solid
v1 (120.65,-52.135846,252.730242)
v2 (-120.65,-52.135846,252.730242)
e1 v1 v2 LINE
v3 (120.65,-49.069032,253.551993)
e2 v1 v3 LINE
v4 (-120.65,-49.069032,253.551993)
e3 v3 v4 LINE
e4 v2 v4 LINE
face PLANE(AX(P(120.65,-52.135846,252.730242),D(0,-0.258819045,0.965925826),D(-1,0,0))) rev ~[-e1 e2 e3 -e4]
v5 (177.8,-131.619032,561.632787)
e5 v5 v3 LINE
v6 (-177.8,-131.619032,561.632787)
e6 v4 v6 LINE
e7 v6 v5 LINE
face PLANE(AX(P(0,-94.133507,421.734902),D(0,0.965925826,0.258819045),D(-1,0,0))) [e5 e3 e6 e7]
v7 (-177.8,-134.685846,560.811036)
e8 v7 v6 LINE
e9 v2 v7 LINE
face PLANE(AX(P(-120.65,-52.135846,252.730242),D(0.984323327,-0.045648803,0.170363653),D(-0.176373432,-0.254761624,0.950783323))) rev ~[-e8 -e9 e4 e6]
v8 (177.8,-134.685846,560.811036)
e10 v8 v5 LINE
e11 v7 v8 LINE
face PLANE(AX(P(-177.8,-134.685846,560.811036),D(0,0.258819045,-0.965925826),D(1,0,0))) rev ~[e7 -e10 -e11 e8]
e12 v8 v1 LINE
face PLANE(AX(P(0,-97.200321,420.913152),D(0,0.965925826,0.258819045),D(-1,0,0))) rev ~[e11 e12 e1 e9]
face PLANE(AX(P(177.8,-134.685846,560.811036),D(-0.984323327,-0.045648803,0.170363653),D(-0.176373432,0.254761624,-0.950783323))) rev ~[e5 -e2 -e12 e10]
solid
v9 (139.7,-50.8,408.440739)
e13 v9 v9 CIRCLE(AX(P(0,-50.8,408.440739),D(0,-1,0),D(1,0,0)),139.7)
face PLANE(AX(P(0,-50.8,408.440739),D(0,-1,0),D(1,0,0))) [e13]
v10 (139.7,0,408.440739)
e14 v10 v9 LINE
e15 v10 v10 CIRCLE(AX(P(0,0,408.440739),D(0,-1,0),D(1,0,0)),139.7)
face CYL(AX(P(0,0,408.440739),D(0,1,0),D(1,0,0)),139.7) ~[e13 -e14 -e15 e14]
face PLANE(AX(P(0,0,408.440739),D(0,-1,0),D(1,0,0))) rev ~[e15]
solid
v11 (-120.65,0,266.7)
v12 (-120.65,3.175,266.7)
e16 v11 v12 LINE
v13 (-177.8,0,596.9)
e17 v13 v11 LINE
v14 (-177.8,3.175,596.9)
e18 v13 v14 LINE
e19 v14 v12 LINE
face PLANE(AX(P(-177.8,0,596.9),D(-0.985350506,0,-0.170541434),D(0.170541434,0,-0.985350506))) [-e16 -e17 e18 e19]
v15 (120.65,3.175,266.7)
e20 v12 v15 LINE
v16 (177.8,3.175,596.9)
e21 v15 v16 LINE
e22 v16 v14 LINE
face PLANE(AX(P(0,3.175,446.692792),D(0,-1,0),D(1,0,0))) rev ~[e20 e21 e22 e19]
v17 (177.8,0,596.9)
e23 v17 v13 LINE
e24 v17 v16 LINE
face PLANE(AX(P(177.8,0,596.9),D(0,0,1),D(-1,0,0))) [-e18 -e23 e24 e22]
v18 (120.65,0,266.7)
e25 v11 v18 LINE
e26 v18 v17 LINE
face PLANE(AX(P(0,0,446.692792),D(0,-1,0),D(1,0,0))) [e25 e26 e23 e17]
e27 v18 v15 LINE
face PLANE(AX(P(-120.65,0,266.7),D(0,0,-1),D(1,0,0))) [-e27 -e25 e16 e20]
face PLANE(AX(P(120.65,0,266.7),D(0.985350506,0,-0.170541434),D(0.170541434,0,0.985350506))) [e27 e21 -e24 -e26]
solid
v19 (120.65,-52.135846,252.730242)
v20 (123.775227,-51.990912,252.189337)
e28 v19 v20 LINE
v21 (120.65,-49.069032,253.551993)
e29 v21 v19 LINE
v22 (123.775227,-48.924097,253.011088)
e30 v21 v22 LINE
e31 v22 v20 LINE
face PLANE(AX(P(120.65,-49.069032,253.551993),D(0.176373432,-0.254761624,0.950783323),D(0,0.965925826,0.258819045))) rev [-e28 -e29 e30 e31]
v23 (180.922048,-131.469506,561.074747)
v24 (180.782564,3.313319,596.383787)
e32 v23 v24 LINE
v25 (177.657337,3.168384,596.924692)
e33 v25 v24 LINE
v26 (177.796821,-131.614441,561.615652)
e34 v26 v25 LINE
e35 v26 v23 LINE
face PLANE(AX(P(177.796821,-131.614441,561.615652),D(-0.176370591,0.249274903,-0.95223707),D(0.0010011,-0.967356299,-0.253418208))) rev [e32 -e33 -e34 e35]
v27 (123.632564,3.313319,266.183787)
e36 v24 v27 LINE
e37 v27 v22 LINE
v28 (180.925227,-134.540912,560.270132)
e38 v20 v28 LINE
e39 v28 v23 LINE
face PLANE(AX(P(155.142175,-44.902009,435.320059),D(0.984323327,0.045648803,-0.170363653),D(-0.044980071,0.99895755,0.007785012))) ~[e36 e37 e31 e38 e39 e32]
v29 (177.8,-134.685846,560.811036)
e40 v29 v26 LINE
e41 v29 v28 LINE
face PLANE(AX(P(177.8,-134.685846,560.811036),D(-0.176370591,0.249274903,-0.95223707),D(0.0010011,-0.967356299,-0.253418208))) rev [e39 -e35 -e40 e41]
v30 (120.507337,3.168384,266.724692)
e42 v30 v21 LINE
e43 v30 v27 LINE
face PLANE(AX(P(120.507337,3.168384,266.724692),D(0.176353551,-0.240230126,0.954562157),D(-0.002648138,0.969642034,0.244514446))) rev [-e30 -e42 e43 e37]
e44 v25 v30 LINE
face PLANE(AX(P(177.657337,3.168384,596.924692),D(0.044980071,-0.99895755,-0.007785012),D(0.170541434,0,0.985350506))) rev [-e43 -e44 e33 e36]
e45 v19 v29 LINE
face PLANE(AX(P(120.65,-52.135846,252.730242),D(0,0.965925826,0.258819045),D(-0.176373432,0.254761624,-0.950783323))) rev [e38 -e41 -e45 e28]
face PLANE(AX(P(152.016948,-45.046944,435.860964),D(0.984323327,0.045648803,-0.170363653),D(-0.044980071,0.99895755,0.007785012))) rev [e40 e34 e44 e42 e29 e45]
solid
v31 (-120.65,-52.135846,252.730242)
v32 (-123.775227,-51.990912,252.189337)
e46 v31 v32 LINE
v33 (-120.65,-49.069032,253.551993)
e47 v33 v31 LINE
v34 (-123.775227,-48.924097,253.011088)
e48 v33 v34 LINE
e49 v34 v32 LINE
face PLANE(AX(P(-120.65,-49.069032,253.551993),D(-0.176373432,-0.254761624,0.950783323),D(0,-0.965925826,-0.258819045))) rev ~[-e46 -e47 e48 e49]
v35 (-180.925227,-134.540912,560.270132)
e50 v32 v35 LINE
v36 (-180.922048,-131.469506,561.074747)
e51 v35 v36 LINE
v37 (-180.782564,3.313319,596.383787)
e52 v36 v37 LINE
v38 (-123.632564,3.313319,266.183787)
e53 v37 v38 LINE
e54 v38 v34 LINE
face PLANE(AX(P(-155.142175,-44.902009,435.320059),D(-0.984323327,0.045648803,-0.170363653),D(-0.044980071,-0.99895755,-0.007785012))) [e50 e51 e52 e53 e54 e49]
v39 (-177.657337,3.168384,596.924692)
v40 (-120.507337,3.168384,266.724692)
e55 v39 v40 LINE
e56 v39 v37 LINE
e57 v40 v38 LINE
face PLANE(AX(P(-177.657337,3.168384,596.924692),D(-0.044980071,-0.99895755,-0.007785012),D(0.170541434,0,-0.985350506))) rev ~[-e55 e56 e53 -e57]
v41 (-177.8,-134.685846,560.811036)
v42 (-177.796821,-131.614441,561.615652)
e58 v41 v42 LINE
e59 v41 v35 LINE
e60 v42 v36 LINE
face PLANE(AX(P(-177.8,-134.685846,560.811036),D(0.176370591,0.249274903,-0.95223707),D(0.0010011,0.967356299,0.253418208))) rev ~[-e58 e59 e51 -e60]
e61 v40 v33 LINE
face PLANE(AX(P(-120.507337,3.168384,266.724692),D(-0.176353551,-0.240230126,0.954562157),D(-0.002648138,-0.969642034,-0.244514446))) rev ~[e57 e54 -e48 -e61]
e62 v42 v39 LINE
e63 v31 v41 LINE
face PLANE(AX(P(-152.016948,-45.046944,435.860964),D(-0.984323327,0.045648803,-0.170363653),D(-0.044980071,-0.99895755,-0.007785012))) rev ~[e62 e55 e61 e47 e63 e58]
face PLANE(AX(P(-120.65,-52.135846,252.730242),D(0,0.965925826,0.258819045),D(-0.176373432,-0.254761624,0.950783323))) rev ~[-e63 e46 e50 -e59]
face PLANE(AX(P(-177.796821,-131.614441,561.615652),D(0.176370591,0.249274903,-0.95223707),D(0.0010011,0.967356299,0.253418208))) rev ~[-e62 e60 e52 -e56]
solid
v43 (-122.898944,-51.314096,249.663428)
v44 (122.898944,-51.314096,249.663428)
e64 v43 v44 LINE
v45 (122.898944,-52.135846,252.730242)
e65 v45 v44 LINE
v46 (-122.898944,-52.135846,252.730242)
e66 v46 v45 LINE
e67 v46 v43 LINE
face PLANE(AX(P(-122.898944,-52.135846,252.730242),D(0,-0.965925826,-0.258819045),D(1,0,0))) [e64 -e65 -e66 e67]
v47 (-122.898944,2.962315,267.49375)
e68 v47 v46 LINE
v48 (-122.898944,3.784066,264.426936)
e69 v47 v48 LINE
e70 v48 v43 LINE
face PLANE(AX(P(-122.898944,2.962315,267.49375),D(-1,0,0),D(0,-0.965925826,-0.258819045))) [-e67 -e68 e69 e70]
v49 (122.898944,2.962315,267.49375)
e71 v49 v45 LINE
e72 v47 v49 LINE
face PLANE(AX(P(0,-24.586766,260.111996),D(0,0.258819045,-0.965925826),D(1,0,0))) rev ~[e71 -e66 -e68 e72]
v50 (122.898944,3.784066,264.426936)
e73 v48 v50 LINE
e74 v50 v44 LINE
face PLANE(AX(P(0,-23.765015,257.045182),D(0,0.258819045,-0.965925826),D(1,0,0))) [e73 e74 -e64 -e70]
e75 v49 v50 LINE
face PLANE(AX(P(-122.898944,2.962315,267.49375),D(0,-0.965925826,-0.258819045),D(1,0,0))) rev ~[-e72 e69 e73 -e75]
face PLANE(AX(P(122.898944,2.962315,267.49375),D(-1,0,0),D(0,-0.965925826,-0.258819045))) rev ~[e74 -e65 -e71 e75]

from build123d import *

# Parameters (mm, degrees)
F2_DEPTH  = 3.175
F3_R      = 139.7
F4_DEPTH  = 50.8
F8_DEPTH  = 3.175
F10_DEPTH = 3.175
F12_W     = 245.7978874445
F12_H     = 57.0418144985
F13_DEPTH = 3.175


with BuildPart() as f2:
    # F1 (on Front) → F2 (new body)
    with BuildSketch(Plane.XZ):
        Polygon((120.65, 266.7), (177.8, 596.9), (-177.8, 596.9), (-120.65, 266.7), align=None)
    extrude(amount=-F2_DEPTH)


with BuildPart() as f4:
    # F3 (on face) → F4 (new body)
    with BuildSketch(Plane.XZ):
        with Locations((0, 408.4407389164)):
            Circle(F3_R)
    extrude(amount=F4_DEPTH)


with BuildPart() as f8:
    # F7 (on face) → F8 (new body)
    with BuildSketch(Plane(origin=(0, 14.539153526, 3.8957544459), x_dir=(-1, 0, 0), z_dir=(0, 0.9659258263, 0.2588190451))):
        Polygon((120.65, 257.6124178713), (177.8, 576.5611257119), (-177.8, 576.5611257119), (-120.65, 257.6124178713), align=None)
    extrude(amount=F8_DEPTH)


with BuildPart() as f10:
    # F9 (on face) → F10 (new body)
    with BuildSketch(Plane(origin=(-72.1731684636, 3.347089997, -12.4915099264), x_dir=(-0.0449800713, -0.99895755, -0.0077850123), z_dir=(-0.9843233273, 0.0456488032, -0.1703636528))):
        Polygon((135.102368204, 583.7099916129), (0.1788925906, 618.477983858), (0.1788925906, 283.3688038882), (52.4708201773, 270.4134080558), align=None)
        Polygon((138.1769790582, 582.9177051272), (135.102368204, 583.7099916129), (52.4708201773, 270.4134080558), (55.5408350126, 269.6036958163), align=None)
    extrude(amount=F10_DEPTH)


with BuildPart() as f11_1:
    # F11: instance of F10
    add(f10.part.mirror(Plane.YZ))


with BuildPart() as f13:
    # F12 (on face) → F13 (new body)
    with BuildSketch(Plane(origin=(0, -66.675, 248.8344875947), x_dir=(1, 0, 0), z_dir=(0, 0.2588190451, -0.9659258263))):
        with Locations((0, -43.5729465781)):
            Rectangle(F12_W, F12_H)
    extrude(amount=F13_DEPTH)


solid = Compound([f2.part, f4.part, f8.part, f10.part, f11_1.part, f13.part])
